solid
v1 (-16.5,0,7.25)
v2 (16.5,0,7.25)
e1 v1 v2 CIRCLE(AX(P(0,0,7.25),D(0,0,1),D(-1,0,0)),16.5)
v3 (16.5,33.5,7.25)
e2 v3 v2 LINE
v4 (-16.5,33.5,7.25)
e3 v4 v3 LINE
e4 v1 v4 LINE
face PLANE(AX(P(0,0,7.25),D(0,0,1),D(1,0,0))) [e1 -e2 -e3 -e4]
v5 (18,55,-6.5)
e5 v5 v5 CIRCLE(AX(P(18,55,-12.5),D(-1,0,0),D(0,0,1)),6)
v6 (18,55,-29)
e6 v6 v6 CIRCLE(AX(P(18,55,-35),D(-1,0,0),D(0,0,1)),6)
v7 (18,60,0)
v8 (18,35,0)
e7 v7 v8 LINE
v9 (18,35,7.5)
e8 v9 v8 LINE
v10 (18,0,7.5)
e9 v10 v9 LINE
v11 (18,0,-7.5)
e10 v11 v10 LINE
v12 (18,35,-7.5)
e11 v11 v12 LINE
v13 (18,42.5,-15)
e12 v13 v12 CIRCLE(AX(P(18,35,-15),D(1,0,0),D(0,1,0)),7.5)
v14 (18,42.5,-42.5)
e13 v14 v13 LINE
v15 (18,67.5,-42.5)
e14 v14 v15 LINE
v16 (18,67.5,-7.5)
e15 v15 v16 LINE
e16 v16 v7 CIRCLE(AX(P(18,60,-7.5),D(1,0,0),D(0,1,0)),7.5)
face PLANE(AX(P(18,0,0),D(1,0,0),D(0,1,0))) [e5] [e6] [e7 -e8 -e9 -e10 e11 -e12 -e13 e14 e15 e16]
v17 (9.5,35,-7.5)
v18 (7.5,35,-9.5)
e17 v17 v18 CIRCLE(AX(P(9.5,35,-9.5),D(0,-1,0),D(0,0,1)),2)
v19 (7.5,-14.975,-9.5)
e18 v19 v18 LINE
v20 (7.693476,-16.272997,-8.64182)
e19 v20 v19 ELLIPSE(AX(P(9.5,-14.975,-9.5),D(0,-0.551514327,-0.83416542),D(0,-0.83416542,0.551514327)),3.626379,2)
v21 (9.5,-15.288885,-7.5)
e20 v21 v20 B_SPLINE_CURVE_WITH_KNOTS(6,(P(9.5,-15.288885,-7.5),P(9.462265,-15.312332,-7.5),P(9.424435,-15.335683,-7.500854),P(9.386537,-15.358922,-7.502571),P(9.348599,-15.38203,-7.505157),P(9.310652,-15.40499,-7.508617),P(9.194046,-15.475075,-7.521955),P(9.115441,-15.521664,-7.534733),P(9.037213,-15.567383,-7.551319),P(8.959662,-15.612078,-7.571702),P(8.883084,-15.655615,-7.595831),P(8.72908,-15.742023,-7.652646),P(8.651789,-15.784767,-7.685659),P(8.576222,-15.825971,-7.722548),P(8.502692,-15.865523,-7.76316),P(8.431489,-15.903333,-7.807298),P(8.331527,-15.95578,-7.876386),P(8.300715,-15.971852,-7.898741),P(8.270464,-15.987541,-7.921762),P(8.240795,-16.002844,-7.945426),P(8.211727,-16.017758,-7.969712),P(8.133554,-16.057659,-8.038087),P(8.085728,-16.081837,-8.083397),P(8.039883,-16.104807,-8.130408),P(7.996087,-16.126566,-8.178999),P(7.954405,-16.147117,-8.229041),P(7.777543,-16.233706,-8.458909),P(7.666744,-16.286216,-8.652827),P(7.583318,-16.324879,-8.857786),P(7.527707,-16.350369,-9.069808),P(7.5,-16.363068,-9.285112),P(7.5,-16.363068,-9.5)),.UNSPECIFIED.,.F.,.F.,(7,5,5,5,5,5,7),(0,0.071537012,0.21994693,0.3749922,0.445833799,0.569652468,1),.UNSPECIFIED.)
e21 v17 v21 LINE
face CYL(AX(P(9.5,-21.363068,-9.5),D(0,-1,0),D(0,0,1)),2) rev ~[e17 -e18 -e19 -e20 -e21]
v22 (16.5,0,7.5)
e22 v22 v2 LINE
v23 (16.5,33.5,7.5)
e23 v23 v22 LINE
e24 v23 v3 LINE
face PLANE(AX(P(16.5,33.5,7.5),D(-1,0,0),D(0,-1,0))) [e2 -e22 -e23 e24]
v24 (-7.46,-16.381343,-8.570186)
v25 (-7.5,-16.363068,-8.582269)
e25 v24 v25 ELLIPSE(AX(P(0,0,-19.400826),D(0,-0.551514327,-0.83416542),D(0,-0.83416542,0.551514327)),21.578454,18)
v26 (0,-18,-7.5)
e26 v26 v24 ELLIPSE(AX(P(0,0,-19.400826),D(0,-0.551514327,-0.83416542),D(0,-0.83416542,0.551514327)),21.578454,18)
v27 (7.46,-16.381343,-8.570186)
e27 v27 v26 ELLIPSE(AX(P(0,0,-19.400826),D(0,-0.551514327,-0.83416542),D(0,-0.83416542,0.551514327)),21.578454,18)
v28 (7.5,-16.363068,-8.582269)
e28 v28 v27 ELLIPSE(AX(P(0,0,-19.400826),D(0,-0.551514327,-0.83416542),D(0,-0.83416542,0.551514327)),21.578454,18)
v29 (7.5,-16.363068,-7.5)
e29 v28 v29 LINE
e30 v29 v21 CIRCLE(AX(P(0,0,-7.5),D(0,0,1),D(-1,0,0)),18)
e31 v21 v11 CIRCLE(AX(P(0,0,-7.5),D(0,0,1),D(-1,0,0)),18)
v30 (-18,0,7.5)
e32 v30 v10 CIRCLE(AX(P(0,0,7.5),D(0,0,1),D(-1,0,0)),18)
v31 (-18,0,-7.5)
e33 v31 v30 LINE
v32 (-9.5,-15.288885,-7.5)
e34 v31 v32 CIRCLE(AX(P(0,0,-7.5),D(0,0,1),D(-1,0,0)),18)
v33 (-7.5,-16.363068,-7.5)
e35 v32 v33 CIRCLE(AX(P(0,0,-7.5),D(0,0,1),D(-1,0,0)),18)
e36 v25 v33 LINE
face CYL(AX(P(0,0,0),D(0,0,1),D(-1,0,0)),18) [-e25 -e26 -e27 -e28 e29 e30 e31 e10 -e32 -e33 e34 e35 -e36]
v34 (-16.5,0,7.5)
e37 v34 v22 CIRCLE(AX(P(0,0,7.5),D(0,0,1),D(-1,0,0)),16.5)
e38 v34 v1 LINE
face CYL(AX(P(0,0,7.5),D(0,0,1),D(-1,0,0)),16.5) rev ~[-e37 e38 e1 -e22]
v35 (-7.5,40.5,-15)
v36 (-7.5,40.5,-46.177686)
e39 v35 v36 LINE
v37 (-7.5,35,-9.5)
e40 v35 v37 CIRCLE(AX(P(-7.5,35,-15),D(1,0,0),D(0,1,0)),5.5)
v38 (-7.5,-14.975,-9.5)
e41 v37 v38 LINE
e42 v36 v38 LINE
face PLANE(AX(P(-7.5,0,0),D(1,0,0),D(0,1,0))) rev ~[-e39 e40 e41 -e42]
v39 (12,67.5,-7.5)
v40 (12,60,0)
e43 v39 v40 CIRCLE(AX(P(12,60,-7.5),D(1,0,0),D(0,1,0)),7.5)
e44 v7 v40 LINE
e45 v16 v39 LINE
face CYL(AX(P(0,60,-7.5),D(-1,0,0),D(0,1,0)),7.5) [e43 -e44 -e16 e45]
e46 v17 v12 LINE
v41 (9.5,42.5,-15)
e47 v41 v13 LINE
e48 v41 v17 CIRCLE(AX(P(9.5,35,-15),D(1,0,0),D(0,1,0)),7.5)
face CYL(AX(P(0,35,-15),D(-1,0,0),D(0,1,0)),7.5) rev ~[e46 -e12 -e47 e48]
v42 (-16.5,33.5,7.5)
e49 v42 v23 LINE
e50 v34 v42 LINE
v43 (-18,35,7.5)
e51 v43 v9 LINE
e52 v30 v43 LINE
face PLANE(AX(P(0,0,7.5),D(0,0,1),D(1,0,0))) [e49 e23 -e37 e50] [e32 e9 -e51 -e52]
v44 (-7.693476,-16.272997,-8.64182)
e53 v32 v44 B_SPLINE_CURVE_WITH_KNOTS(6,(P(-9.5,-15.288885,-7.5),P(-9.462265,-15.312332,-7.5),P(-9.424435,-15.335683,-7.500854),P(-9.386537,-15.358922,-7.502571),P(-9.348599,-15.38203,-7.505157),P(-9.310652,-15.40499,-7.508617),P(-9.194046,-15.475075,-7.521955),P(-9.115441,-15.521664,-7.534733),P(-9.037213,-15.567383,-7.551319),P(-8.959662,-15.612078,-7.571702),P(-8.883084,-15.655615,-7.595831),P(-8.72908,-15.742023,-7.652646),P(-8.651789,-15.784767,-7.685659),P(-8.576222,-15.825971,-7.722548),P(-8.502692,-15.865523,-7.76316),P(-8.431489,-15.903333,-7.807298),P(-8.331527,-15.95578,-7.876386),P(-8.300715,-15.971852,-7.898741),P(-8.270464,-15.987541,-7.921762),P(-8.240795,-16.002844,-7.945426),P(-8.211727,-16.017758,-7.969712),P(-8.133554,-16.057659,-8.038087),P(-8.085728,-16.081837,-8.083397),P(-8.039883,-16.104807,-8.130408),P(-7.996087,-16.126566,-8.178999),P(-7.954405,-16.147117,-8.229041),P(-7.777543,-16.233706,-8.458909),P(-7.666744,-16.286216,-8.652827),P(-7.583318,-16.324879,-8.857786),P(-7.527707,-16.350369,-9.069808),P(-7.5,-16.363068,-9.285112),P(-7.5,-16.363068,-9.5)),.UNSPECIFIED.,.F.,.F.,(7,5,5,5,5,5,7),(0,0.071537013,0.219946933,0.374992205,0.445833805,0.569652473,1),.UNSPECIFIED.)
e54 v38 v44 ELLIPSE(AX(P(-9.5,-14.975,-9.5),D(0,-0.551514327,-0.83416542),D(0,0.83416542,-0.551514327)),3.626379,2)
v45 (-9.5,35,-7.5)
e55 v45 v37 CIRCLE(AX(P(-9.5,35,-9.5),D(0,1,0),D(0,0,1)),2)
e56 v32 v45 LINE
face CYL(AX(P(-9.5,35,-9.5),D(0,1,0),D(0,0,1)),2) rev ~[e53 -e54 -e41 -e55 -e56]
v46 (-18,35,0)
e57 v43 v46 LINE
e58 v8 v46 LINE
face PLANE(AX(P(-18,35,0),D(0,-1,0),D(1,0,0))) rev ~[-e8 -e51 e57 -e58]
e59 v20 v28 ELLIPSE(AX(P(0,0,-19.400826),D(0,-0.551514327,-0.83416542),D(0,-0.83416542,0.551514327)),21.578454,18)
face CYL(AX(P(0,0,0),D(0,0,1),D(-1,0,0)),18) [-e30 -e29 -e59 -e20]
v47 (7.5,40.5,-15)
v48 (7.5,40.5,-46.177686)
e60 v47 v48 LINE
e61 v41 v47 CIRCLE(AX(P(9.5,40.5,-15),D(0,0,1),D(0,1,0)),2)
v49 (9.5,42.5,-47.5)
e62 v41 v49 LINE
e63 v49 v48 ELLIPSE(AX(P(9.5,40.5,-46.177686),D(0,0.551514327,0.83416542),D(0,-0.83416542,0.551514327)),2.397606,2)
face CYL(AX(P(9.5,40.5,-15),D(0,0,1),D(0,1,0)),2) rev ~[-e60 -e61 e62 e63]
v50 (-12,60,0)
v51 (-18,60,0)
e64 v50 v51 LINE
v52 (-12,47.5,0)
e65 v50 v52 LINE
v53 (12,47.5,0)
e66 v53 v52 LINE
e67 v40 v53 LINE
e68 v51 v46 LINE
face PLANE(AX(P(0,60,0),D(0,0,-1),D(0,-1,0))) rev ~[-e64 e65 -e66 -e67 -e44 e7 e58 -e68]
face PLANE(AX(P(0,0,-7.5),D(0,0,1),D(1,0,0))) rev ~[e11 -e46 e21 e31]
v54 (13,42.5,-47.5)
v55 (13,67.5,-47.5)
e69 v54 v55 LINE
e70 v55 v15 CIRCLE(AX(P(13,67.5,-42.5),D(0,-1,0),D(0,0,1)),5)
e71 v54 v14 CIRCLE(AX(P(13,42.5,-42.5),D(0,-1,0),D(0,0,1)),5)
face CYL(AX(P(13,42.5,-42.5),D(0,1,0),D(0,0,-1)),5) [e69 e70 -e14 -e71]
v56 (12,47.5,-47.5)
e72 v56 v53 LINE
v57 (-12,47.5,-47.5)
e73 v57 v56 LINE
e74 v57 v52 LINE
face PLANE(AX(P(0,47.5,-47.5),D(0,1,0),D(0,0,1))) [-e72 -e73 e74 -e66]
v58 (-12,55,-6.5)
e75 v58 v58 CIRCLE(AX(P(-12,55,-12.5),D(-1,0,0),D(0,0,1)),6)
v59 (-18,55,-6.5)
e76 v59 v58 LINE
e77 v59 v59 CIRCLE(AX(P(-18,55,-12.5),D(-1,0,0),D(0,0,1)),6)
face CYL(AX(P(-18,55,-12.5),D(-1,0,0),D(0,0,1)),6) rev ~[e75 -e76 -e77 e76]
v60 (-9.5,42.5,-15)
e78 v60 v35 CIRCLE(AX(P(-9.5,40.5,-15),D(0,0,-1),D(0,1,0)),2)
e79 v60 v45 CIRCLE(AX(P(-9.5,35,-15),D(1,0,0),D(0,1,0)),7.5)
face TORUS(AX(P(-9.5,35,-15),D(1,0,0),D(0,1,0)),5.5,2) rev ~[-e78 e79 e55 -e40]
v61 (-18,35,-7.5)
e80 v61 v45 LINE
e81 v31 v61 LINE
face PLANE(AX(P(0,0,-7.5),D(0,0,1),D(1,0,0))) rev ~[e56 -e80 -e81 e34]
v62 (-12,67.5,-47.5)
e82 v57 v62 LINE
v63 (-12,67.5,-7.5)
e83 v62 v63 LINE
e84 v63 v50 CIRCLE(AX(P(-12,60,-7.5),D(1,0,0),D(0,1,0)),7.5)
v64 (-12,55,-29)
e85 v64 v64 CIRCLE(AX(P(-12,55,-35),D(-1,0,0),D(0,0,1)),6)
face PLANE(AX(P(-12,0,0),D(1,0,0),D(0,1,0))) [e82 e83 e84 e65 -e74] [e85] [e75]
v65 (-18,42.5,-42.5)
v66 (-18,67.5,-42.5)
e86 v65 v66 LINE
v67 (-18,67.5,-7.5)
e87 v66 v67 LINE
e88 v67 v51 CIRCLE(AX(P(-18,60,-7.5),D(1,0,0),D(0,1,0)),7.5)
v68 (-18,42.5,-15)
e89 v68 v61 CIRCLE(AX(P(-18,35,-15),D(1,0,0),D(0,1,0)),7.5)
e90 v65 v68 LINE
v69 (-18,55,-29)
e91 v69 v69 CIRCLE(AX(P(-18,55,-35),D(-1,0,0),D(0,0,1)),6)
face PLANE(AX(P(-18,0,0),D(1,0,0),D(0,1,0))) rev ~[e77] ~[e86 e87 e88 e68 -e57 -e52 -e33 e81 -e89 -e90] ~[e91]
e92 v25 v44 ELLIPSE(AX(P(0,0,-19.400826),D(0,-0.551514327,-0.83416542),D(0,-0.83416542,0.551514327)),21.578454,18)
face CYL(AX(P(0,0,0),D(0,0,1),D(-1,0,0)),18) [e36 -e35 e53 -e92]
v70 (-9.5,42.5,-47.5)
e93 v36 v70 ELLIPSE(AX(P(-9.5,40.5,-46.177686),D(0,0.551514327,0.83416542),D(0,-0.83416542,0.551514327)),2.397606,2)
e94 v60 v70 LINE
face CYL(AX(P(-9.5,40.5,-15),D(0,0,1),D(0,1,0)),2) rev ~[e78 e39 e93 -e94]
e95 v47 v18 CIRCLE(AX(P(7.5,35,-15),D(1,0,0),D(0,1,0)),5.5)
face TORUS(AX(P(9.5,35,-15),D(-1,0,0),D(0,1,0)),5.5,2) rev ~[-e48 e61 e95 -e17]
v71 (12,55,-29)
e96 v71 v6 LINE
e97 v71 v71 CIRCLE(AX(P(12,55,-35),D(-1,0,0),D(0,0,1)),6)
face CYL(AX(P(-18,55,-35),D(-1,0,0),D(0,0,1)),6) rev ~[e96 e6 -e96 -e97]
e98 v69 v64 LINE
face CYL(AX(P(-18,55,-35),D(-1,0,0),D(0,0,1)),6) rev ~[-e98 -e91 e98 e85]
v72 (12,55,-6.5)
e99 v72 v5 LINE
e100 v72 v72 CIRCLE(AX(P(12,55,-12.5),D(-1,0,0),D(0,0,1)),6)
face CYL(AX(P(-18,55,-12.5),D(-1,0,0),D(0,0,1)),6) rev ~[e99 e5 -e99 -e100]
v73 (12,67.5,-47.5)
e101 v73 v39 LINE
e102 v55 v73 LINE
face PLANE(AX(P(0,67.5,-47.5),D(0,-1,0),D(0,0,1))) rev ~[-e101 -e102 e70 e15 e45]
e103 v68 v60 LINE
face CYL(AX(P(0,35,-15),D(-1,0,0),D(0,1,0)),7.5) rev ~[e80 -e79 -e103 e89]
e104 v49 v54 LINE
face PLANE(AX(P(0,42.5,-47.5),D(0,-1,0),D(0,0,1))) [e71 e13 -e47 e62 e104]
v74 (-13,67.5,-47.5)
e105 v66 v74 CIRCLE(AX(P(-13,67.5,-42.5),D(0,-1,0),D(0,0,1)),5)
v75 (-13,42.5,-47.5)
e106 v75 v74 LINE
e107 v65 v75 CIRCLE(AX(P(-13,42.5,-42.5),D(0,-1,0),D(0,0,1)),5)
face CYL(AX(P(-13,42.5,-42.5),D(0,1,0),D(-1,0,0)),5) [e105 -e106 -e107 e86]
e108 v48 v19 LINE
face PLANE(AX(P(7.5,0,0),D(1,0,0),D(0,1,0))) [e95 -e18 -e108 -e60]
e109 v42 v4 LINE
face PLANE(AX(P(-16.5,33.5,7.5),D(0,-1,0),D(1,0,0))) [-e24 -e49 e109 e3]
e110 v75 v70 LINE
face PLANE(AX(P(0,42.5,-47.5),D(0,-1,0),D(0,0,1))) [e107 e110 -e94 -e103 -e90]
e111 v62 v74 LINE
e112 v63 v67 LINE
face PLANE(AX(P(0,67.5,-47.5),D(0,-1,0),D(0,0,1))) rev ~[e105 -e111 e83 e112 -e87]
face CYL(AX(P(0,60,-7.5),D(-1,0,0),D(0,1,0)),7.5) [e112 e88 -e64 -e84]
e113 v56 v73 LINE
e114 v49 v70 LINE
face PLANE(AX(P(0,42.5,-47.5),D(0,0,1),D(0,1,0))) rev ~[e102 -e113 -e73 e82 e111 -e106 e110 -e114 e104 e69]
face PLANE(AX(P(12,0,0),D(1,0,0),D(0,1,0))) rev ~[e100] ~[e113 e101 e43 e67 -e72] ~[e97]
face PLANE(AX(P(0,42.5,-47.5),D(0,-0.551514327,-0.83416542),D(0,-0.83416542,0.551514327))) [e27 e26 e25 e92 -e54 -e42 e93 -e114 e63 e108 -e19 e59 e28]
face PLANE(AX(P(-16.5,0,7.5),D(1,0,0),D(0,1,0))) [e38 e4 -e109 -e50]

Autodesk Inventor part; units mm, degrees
ref_plane "YZ Plane" through (0, 0, 0) normal (1, 0, 0) x (0, 1, 0)
ref_plane "XZ Plane" through (0, 0, 0) normal (0, 1, 0) x (-1, 0, 0)
ref_plane "XY Plane" through (0, 0, 0) normal (0, 0, 1) x (1, 0, 0)
sketch "Sketch1" plane through (0, 0, 0) normal (0, 0, 1) x (1, 0, 0)
  arc A0 (-18, 0) -> (18, 0) centre (0, 0) ccw
  line L0 (-18, 0) -> (-18, 35)
  line L1 (18, 0) -> (18, 35)
  line L2 (-18, 35) -> (18, 35)
  dimension "d0" = 36
  dimension "d2" = 35
extrude "Extrusion1" add sketch "Sketch1" against normal mid plane 15
sketch "Sketch2" plane through (0, 0, 0) normal (1, 0, 0) x (0, 1, 0)
  line L0 (35, -7.5) -> (0, -7.5) projected
  line L1 (35, -7.5) -> (35, 7.5) projected
  arc A0 (42.5, -15) -> (35, -7.5) centre (35, -15) ccw
  line L2 (42.5, -47.5) -> (42.5, -15)
  line L3 (42.5, -47.5) -> (67.5, -47.5)
  line L4 (67.5, -47.5) -> (67.5, -7.5)
  line L5 (60, 0) -> (35, 0)
  arc A1 (67.5, -7.5) -> (60, 0) centre (60, -7.5) ccw
  point P0 (0, 0)
  dimension "d10" = 40
  dimension "d11" = 25
  dimension "d12" = 15
extrude "Extrusion2" add sketch "Sketch2" along normal mid plane 36
sketch "Sketch3" plane through (0, 0, 0) normal (1, 0, 0) x (0, 1, 0)
  line L0 (42.5, -47.5) -> (67.5, -47.5) projected
  line L1 (-18, -7.5) -> (0, -7.5) projected
  line L2 (42.5, -47.5) -> (-18, -7.5)
  line L3 (35, -7.5) -> (0, -7.5) projected
  arc A0 (42.5, -15) -> (35, -7.5) centre (35, -15) ccw projected
  line L4 (42.5, -15) -> (42.5, -47.5) projected
  point P0 (0, 0)
extrude "Extrusion3" add sketch "Sketch3" along normal mid plane 15
delete faces "Delete Face1" heal yes whole lump no faces at (-6.6957, -17.2098, -7.5) (6.6957, -17.2098, -7.5)
fillet "Fillet1" radius 2 6 edges at (-7.5, 40.3033, -9.6967) (-7.5, 42.5, -31.25) (-7.5, 9.3185, -7.5) (7.5, 42.5, -31.25) (7.5, 9.3185, -7.5) (7.5, 40.3033, -9.6967)
sketch "Sketch5" plane through (0, 0, 0) normal (1, 0, 0) x (0, 1, 0)
  line L0 (47.5, -54.8971) -> (47.5, 0)
  line L1 (67.5, -47.5) -> (67.5, -7.5) projected
  line L2 (0, -7.5) -> (0, 7.5) projected
  line L3 (35, -7.5) -> (0, -7.5) projected
  arc A0 (42.5, -15) -> (35, -7.5) centre (35, -15) ccw projected
  line L4 (42.5, -15) -> (42.5, -47.5) projected
  line L5 (42.5, -47.5) -> (67.5, -47.5) projected
  line L6 (67.5, -47.5) -> (67.5, -7.5) projected
  arc A1 (67.5, -7.5) -> (60, 0) centre (60, -7.5) ccw projected
  line L7 (60, 0) -> (35, 0) projected
  line L8 (35, 0) -> (35, 7.5) projected
  line L9 (0, 7.5) -> (35, 7.5) projected
  point P0 (0, 0)
  point P1 (47.5, -47.5)
  dimension "d21" = 20
extrude "Extrusion5" cut sketch "Sketch5" against normal mid plane 24 contours L0 L7 A1 L1 L5
sketch "Sketch6" plane through (0, 0, 7.5) normal (0, 0, 1) x (1, 0, 0)
  arc A0 (-18, 0) -> (18, 0) centre (0, 0) ccw projected
  line L0 (18, 0) -> (18, 35) projected
  line L1 (18, 35) -> (-18, 35) projected
  line L2 (-18, 35) -> (-18, 0) projected
  arc A1 (-16.5, 0) -> (16.5, 0) centre (0, 0) ccw
  line L3 (-16.5, 0) -> (-16.5, 33.5)
  line L4 (-16.5, 33.5) -> (16.5, 33.5)
  line L5 (16.5, 33.5) -> (16.5, 0)
  dimension "d24" = 1.5
extrude "Extrusion6" cut sketch "Sketch6" against normal blind 0.25 contours L3 L4 L5 A1
fillet "Fillet2" radius 5 2 edges at (-18, 55, -47.5) (18, 55, -47.5)
sketch "Sketch7" plane through (-18, 35, 0) normal (-1, 0, 0) x (0, 0, 1)
  line L0 (-42.5, 7.5) -> (-42.5, 32.5) projected
  line L1 (-42.5, 7.5) -> (-15, 7.5) projected
  arc A0 (-7.5, 0) -> (-15, 7.5) centre (-15, 0) ccw projected
  line L2 (-7.5, -35) -> (-7.5, 0) projected
  line L3 (7.5, -35) -> (-7.5, -35) projected
  line L4 (7.5, 0) -> (7.5, -35) projected
  line L5 (0, 0) -> (7.5, 0) projected
  line L6 (0, 0) -> (0, 25) projected
  arc A1 (0, 25) -> (-7.5, 32.5) centre (-7.5, 25) ccw projected
  line L7 (-7.5, 32.5) -> (-42.5, 32.5) projected
  circle A2 centre (-12.5, 20) radius 6
  line L8 (-47.5, 32.5) -> (-47.5, 7.5) projected
  circle A3 centre (-35, 20) radius 6
  point P0 (0, -35)
  point P1 (-47.5, 20)
  dimension "d28" = 25
  dimension "d29" = 12
  dimension "d30" = 47.5
  dimension "d31" = 12.5
  dimension "d32" = 12
  dimension "d33" = 12.5
extrude "Extrusion7" cut sketch "Sketch7" against normal through all contours A2 | A3
properties part number "Holder of gripper"
